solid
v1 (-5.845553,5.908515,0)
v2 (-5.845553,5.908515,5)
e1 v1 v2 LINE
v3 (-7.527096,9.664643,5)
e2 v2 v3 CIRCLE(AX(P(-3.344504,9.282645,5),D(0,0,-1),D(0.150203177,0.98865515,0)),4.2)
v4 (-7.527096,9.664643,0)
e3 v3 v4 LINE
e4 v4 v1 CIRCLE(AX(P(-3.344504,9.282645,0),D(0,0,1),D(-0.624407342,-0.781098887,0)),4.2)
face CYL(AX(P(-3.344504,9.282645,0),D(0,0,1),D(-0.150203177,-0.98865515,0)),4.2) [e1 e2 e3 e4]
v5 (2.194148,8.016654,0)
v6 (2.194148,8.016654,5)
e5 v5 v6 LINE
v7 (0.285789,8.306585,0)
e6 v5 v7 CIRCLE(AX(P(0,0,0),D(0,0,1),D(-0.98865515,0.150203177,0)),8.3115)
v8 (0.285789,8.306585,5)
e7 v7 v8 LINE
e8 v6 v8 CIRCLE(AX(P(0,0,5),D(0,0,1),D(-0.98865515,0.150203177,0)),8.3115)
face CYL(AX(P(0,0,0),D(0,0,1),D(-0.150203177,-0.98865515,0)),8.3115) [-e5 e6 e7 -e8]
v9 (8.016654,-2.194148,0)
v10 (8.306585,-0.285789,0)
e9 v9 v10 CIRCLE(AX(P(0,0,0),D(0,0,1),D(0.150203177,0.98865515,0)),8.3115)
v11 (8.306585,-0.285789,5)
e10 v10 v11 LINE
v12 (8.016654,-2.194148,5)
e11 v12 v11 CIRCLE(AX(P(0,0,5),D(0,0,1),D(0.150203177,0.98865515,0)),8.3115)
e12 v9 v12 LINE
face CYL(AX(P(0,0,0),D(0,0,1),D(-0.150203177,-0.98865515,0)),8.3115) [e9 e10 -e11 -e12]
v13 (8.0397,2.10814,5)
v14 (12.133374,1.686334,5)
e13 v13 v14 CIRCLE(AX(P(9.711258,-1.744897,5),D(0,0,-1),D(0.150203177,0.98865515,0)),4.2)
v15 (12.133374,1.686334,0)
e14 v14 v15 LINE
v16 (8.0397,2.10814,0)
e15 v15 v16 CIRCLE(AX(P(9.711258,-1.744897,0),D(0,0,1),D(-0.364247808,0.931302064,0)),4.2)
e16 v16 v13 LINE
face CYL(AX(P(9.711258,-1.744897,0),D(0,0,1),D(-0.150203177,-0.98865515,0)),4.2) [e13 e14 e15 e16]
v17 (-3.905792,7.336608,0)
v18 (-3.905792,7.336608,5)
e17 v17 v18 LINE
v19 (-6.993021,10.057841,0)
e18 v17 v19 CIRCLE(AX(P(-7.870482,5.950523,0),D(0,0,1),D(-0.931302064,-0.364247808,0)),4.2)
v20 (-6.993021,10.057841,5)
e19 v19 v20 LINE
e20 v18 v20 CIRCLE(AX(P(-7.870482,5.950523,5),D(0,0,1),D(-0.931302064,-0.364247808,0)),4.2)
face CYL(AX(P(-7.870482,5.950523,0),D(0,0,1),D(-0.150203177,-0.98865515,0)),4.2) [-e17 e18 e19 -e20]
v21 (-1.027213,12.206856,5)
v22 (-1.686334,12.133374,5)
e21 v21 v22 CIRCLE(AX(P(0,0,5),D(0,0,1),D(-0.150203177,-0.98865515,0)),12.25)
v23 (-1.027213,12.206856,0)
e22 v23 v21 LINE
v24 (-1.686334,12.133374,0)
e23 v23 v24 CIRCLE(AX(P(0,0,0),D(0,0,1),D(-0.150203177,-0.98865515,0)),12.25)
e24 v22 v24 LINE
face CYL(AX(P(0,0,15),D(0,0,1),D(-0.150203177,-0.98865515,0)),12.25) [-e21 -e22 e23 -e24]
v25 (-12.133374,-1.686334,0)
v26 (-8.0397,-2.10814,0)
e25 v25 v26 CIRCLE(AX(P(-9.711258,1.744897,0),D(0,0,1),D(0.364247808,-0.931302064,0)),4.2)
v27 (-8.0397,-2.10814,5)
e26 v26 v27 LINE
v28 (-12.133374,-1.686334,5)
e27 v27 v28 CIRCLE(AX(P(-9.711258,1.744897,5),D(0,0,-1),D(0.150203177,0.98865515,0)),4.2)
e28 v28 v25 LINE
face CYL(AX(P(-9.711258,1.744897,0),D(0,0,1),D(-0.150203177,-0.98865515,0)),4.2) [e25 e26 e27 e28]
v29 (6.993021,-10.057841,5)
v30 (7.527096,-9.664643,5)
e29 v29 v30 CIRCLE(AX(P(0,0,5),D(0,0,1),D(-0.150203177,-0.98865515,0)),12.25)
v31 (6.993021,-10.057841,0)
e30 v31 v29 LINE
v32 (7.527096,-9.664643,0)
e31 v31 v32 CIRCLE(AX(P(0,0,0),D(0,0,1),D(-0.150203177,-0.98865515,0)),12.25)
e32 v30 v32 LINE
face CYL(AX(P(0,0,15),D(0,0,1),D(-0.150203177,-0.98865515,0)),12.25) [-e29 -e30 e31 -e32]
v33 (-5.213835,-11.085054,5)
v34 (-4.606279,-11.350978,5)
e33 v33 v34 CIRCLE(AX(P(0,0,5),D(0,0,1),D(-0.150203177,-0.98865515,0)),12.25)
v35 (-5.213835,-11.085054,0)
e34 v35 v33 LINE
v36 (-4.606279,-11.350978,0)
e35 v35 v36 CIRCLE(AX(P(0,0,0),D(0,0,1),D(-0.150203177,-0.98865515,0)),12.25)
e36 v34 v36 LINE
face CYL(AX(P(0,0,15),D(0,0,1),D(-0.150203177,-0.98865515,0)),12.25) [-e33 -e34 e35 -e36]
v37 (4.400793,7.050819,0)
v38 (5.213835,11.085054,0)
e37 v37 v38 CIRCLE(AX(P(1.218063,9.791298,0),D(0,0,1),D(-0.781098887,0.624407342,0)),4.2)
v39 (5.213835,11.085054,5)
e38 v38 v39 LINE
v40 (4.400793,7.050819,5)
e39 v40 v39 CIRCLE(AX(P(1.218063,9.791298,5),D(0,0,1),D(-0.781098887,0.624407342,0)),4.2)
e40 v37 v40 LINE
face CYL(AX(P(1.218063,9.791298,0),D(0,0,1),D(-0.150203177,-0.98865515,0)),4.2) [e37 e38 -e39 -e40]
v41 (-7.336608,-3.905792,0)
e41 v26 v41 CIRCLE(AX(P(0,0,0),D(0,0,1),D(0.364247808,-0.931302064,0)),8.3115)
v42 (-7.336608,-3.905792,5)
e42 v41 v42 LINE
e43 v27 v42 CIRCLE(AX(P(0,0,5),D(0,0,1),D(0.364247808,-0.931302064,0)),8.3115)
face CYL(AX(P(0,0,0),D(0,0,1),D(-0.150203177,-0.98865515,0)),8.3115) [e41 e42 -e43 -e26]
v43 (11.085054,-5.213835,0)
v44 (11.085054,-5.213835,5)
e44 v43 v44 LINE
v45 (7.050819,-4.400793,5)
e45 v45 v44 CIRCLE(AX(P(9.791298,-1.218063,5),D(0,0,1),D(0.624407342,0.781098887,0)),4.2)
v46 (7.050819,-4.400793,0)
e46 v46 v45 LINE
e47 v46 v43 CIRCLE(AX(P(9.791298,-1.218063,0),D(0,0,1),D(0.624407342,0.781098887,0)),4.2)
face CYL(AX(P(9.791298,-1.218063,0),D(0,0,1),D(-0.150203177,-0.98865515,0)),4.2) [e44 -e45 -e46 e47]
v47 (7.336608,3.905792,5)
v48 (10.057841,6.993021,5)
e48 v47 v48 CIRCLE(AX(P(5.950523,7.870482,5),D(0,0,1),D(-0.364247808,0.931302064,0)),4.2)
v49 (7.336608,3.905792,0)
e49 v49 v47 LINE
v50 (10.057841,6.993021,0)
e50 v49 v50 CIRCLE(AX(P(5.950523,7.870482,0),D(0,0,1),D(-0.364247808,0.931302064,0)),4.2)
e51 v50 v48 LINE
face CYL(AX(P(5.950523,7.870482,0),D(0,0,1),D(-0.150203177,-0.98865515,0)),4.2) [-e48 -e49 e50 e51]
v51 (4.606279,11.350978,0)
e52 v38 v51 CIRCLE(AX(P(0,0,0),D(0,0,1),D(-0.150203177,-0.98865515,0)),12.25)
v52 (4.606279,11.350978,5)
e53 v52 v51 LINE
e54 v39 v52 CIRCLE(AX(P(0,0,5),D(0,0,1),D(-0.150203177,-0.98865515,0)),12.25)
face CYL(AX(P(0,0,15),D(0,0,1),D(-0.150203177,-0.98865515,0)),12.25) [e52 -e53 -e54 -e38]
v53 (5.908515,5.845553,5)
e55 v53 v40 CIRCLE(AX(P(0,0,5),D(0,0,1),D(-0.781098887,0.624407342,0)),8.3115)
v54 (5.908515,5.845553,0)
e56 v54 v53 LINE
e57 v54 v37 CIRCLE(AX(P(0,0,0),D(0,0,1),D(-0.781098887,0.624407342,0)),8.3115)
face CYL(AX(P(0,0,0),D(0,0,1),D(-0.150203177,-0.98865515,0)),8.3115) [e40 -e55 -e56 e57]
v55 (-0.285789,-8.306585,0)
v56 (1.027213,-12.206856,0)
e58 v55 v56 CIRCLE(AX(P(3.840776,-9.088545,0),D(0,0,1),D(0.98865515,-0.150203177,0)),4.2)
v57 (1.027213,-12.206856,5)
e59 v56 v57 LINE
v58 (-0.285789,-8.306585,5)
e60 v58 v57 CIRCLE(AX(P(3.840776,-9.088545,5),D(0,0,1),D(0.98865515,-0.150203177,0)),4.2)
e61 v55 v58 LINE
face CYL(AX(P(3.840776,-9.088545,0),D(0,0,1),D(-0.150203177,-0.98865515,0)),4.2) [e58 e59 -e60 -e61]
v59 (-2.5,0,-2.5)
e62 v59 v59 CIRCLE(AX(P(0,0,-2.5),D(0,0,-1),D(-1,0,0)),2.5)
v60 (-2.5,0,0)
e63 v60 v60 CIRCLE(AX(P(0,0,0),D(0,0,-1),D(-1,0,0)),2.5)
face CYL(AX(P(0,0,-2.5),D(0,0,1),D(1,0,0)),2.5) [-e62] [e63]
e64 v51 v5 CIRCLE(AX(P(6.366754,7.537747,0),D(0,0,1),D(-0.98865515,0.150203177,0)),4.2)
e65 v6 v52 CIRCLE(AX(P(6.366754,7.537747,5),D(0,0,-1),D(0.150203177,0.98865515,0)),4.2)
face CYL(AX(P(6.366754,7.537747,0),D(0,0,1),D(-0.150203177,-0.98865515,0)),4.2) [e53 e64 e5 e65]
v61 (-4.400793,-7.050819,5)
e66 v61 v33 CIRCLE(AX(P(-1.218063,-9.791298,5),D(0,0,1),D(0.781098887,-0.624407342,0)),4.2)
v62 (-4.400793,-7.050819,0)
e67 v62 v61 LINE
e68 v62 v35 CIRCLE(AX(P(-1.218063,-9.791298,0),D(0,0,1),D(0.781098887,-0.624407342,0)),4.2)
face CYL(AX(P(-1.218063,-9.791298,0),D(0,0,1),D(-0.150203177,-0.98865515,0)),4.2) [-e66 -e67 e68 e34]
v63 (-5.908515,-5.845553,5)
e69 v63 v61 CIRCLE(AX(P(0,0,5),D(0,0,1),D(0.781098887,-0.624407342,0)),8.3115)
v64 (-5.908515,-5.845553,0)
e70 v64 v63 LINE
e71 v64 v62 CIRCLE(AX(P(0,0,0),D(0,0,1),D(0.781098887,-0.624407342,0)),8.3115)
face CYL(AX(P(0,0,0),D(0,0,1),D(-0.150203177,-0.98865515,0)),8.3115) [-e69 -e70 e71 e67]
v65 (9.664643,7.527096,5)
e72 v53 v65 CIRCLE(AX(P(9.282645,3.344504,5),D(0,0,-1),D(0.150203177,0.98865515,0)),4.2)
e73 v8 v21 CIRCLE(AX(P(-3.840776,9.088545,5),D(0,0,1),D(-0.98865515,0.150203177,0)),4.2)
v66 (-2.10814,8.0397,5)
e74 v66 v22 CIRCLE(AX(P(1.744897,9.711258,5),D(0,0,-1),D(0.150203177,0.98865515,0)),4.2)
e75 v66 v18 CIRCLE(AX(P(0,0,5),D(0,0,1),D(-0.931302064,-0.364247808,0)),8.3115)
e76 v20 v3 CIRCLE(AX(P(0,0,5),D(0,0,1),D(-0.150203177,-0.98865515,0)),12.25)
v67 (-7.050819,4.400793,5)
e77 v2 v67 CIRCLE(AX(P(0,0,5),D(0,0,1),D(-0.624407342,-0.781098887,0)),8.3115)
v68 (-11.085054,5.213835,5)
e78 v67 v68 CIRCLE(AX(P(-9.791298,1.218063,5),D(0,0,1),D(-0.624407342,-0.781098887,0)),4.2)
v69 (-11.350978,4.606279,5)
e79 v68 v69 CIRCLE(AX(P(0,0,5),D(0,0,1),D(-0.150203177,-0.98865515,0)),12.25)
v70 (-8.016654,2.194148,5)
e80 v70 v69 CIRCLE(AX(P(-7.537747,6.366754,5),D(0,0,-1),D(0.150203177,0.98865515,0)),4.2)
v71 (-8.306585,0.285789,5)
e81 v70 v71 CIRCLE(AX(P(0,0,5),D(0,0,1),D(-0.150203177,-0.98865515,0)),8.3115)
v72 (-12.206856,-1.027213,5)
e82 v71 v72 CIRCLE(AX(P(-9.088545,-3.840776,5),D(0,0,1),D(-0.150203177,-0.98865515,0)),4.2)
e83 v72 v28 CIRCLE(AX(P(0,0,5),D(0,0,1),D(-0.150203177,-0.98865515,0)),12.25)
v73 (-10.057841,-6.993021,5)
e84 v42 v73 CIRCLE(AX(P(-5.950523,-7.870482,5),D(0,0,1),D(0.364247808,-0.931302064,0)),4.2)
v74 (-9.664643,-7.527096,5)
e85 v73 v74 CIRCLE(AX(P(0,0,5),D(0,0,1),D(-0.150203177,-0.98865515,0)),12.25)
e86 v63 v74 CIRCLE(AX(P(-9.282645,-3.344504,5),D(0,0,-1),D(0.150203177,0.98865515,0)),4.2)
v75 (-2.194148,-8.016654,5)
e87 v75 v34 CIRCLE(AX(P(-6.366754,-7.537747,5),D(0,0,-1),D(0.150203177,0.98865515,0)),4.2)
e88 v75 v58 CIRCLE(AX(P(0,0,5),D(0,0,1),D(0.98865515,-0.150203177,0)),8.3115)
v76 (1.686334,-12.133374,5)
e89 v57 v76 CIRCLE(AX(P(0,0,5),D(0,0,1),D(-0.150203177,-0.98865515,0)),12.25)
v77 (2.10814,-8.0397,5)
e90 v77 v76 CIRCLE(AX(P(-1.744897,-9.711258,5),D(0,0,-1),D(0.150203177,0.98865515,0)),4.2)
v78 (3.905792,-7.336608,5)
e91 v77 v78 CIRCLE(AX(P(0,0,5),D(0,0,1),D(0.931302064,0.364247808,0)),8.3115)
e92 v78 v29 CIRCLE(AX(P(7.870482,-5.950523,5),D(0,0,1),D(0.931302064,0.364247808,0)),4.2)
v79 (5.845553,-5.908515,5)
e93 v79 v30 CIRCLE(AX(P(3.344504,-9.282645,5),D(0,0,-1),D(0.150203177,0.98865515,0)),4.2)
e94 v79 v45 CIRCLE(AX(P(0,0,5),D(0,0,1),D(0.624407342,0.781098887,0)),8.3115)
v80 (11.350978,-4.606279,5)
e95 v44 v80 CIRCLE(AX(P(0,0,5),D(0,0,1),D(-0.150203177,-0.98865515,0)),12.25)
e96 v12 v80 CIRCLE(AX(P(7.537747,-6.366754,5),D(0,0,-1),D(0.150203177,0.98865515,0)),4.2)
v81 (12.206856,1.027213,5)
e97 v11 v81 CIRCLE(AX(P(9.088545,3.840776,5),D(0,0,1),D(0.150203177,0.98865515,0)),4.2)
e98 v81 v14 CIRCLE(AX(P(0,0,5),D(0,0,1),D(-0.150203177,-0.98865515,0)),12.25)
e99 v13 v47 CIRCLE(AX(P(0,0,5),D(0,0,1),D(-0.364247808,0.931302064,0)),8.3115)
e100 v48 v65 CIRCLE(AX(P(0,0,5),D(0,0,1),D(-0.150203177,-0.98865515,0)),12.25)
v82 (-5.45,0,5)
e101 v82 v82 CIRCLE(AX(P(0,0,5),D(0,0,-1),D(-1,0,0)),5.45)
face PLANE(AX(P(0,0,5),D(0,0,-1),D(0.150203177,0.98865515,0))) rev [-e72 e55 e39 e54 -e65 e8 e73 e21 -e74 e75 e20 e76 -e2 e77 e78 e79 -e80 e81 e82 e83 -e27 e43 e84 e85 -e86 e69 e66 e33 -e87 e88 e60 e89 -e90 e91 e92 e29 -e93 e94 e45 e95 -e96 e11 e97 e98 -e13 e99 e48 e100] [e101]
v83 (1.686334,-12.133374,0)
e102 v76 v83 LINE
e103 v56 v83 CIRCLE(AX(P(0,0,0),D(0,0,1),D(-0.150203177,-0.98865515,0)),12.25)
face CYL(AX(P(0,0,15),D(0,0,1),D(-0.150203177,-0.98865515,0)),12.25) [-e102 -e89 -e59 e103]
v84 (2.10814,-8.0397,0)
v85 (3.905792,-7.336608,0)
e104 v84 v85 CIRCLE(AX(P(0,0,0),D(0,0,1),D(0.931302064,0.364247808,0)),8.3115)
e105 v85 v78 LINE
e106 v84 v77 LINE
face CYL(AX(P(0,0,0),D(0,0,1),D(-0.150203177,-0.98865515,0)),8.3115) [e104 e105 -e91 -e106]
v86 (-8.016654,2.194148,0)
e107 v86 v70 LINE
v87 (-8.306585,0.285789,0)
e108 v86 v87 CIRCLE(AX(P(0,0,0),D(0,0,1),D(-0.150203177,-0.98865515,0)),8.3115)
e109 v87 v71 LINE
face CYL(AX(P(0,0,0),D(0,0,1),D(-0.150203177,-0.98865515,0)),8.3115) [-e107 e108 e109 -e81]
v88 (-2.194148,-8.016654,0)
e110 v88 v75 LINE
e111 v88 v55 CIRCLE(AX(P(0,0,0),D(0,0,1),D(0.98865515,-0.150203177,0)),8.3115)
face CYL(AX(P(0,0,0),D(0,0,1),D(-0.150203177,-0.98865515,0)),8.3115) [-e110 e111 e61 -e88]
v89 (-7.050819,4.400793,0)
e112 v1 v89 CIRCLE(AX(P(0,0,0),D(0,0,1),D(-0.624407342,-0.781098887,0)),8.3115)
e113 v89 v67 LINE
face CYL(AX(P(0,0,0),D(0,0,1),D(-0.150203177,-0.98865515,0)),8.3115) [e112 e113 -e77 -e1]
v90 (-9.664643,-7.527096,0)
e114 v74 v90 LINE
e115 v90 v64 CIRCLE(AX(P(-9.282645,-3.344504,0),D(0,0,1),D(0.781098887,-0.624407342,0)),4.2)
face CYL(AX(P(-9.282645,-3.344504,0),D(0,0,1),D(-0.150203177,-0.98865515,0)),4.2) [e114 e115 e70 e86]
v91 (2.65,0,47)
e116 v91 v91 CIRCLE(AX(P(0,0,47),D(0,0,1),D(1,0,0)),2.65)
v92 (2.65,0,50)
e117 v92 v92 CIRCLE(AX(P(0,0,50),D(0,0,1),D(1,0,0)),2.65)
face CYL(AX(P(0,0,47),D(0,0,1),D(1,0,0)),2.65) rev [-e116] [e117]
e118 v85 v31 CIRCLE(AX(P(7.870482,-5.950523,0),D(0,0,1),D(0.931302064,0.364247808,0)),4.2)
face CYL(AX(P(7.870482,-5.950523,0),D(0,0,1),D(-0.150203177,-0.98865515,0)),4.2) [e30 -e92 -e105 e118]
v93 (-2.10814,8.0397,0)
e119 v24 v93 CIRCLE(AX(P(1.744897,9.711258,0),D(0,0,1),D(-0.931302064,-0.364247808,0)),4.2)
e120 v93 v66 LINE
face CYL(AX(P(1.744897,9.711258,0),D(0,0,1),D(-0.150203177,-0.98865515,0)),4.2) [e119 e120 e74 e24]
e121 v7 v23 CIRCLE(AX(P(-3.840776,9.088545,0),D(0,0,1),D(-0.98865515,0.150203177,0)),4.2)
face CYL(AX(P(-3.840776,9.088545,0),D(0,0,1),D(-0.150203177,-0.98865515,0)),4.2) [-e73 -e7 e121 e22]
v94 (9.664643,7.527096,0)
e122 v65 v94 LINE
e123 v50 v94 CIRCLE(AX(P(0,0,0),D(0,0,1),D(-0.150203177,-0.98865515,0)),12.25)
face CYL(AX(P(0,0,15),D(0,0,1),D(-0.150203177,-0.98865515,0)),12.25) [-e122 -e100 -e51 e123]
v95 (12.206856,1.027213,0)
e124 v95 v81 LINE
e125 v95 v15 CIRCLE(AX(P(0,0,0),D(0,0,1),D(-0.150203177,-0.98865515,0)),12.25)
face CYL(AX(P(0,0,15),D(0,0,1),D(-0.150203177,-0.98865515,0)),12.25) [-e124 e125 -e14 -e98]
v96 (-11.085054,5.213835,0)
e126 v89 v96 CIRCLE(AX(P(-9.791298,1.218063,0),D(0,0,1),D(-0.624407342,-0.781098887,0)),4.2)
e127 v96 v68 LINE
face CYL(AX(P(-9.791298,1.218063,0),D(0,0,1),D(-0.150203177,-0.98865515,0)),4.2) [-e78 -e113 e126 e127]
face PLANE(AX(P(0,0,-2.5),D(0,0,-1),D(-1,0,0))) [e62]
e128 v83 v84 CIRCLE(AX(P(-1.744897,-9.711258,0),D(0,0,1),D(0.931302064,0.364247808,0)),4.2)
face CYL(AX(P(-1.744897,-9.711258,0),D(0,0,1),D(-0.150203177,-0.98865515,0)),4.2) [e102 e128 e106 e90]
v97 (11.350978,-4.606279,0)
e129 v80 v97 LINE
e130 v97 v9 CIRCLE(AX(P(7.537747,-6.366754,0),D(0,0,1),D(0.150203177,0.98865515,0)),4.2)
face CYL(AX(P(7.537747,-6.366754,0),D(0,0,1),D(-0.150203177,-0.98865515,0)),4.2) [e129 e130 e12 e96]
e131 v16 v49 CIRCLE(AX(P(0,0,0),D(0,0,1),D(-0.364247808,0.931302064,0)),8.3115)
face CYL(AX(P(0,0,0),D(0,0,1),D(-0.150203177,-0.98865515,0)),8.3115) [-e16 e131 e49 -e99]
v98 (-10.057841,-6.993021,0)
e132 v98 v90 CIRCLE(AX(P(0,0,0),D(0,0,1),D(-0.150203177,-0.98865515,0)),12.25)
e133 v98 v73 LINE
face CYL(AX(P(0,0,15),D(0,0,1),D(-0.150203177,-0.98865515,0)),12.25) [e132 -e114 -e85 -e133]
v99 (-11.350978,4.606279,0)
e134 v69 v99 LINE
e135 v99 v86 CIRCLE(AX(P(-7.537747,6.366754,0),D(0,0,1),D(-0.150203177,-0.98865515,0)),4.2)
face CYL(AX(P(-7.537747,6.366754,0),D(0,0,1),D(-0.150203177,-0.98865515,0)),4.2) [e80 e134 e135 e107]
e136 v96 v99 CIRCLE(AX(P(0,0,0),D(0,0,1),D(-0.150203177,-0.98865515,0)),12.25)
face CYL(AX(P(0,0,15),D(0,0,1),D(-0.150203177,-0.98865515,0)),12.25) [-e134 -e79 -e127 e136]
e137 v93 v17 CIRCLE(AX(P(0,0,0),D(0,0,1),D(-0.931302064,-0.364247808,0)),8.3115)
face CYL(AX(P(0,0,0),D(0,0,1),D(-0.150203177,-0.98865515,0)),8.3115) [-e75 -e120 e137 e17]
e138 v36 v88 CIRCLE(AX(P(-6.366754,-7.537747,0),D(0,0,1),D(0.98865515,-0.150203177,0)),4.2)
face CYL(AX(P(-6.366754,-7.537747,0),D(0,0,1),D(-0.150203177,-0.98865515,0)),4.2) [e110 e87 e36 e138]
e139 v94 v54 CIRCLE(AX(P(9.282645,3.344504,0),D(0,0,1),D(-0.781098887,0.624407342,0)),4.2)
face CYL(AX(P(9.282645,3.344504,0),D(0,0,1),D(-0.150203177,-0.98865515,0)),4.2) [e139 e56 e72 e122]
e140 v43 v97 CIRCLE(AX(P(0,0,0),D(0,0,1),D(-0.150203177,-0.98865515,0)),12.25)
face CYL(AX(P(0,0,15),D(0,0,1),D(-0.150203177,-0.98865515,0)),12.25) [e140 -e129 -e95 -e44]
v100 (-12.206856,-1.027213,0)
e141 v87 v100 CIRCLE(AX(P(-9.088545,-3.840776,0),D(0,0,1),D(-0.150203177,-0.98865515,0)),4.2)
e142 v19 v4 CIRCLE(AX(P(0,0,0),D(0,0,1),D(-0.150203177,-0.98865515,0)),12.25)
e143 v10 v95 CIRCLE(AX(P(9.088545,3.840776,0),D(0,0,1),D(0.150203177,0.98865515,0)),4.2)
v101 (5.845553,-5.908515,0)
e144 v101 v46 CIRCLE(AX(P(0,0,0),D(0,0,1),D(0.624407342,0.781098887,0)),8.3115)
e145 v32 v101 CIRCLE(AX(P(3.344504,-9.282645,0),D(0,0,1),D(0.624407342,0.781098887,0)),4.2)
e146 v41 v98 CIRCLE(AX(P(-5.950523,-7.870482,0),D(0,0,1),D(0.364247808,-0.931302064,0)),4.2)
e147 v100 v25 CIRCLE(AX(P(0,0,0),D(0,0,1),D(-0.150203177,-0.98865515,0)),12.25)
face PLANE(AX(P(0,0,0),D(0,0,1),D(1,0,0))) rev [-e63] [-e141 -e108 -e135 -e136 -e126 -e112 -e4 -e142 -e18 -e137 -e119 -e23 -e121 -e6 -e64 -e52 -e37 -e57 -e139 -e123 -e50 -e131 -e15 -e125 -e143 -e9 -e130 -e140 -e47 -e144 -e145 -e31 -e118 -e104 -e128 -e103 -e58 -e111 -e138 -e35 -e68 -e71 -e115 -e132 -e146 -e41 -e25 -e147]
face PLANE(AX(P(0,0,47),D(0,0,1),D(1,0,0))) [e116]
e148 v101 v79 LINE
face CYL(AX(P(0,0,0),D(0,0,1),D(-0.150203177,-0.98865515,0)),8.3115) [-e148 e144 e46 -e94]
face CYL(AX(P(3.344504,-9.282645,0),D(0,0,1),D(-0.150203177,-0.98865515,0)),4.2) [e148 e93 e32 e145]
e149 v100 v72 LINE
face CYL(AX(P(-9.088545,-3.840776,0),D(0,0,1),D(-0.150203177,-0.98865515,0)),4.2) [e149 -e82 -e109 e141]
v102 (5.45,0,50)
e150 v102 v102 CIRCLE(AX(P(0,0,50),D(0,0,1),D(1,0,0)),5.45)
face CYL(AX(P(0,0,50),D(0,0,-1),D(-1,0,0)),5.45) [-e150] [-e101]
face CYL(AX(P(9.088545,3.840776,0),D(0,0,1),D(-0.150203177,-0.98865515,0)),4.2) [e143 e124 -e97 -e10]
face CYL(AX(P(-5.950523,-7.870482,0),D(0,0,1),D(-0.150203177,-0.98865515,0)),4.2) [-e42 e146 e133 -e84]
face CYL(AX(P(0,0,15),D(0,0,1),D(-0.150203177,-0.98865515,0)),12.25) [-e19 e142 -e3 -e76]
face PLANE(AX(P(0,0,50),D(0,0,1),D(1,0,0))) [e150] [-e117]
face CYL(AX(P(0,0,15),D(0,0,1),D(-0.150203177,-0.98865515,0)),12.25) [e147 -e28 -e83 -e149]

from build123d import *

# Parameters (mm, degrees)
SKETCH1_R           = 5.45
BOSS_EXTRUDE1_DEPTH = 50
SKETCH6_R           = 2.5
BOSS_EXTRUDE2_DEPTH = 2.5
SKETCH7_R           = 2.65
CUT_EXTRUDE1_DEPTH  = 3
JOIN1_DEPTH         = 5


# Read off the part's stored shape, not the designer's step: Join1
with BuildPart() as part:
    # Sketch1 → Boss-Extrude1 (new body)
    with BuildSketch(Plane.XY):
        Circle(SKETCH1_R)
    extrude(amount=BOSS_EXTRUDE1_DEPTH)

    # Sketch6 → Boss-Extrude2 (add)
    with BuildSketch(Plane(origin=(0, 0, 0), x_dir=(-1, 0, 0), z_dir=(0, 0, -1))):
        Circle(SKETCH6_R)
    extrude(amount=BOSS_EXTRUDE2_DEPTH)

    # Sketch7 → Cut-Extrude1 (cut)
    with BuildSketch(Plane.XY.offset(50)):
        Circle(SKETCH7_R)
    extrude(amount=-CUT_EXTRUDE1_DEPTH, mode=Mode.SUBTRACT)

    # Join1 outline → Join1 (add)
    with BuildSketch(Plane.XY):
        with BuildLine():
            ThreePointArc((3.905791733, -7.336608426), (5.093273997, -9.101255459), (6.993020796, -10.05784073))
            ThreePointArc((6.993020796, -10.05784073), (7.262719681, -9.864856959), (7.527095748, -9.664643274))
            ThreePointArc((7.527095748, -9.664643274), (7.177895055, -7.56651264), (5.845552604, -5.908514788))
            ThreePointArc((5.845552604, -5.908514788), (6.492103401, -5.189761622), (7.050819075, -4.400793408))
            ThreePointArc((7.050819075, -4.400793408), (8.961532399, -5.335281436), (11.085054023, -5.213835182))
            ThreePointArc((11.085054023, -5.213835182), (11.222128224, -4.911856891), (11.350977771, -4.60627872))
            ThreePointArc((11.350977771, -4.60627872), (9.999495783, -2.963844637), (8.016654448, -2.194147603))
            ThreePointArc((8.016654448, -2.194147603), (8.21720728, -1.248413703), (8.306585141, -0.28578935))
            ThreePointArc((8.306585141, -0.28578935), (10.428555432, -0.13972306), (12.206855977, 1.027213293))
            ThreePointArc((12.206855977, 1.027213293), (12.174576572, 1.357271264), (12.133374467, 1.686334497))
            ThreePointArc((12.133374467, 1.686334497), (10.141739691, 2.432983143), (8.039700207, 2.10813966))
            ThreePointArc((8.039700207, 2.10813966), (7.740517104, 3.027445658), (7.336608426, 3.905791733))
            ThreePointArc((7.336608426, 3.905791733), (9.101255459, 5.093273997), (10.05784073, 6.993020796))
            ThreePointArc((10.05784073, 6.993020796), (9.864856959, 7.262719681), (9.664643274, 7.527095748))
            ThreePointArc((9.664643274, 7.527095748), (7.56651264, 7.177895055), (5.908514788, 5.845552604))
            ThreePointArc((5.908514788, 5.845552604), (5.189761622, 6.492103401), (4.400793408, 7.050819075))
            ThreePointArc((4.400793408, 7.050819075), (5.335281436, 8.961532399), (5.213835182, 11.085054023))
            ThreePointArc((5.213835182, 11.085054023), (4.911856891, 11.222128224), (4.60627872, 11.350977771))
            ThreePointArc((4.60627872, 11.350977771), (2.963844637, 9.999495783), (2.194147603, 8.016654448))
            ThreePointArc((2.194147603, 8.016654448), (1.248413703, 8.21720728), (0.28578935, 8.306585141))
            ThreePointArc((0.28578935, 8.306585141), (0.13972306, 10.428555432), (-1.027213293, 12.206855977))
            ThreePointArc((-1.027213293, 12.206855977), (-1.357271264, 12.174576572), (-1.686334497, 12.133374467))
            ThreePointArc((-1.686334497, 12.133374467), (-2.432983143, 10.141739691), (-2.10813966, 8.039700207))
            ThreePointArc((-2.10813966, 8.039700207), (-3.027445658, 7.740517104), (-3.905791733, 7.336608426))
            ThreePointArc((-3.905791733, 7.336608426), (-5.093273997, 9.101255459), (-6.993020796, 10.05784073))
            ThreePointArc((-6.993020796, 10.05784073), (-7.262719681, 9.864856959), (-7.527095748, 9.664643274))
            ThreePointArc((-7.527095748, 9.664643274), (-7.177895055, 7.56651264), (-5.845552604, 5.908514788))
            ThreePointArc((-5.845552604, 5.908514788), (-6.492103401, 5.189761622), (-7.050819075, 4.400793408))
            ThreePointArc((-7.050819075, 4.400793408), (-8.961532399, 5.335281436), (-11.085054023, 5.213835182))
            ThreePointArc((-11.085054023, 5.213835182), (-11.222128224, 4.911856891), (-11.350977771, 4.60627872))
            ThreePointArc((-11.350977771, 4.60627872), (-9.999495783, 2.963844637), (-8.016654448, 2.194147603))
            ThreePointArc((-8.016654448, 2.194147603), (-8.21720728, 1.248413703), (-8.306585141, 0.28578935))
            ThreePointArc((-8.306585141, 0.28578935), (-10.428555432, 0.13972306), (-12.206855977, -1.027213293))
            ThreePointArc((-12.206855977, -1.027213293), (-12.174576572, -1.357271264), (-12.133374467, -1.686334497))
            ThreePointArc((-12.133374467, -1.686334497), (-10.141739691, -2.432983143), (-8.039700207, -2.10813966))
            ThreePointArc((-8.039700207, -2.10813966), (-7.740517104, -3.027445658), (-7.336608426, -3.905791733))
            ThreePointArc((-7.336608426, -3.905791733), (-9.101255459, -5.093273997), (-10.05784073, -6.993020796))
            ThreePointArc((-10.05784073, -6.993020796), (-9.864856959, -7.262719681), (-9.664643274, -7.527095748))
            ThreePointArc((-9.664643274, -7.527095748), (-7.56651264, -7.177895055), (-5.908514788, -5.845552604))
            ThreePointArc((-5.908514788, -5.845552604), (-5.189761622, -6.492103401), (-4.400793408, -7.050819075))
            ThreePointArc((-4.400793408, -7.050819075), (-5.335281436, -8.961532399), (-5.213835182, -11.085054023))
            ThreePointArc((-5.213835182, -11.085054023), (-4.911856891, -11.222128224), (-4.60627872, -11.350977771))
            ThreePointArc((-4.60627872, -11.350977771), (-2.963844637, -9.999495783), (-2.194147603, -8.016654448))
            ThreePointArc((-2.194147603, -8.016654448), (-1.248413703, -8.21720728), (-0.28578935, -8.306585141))
            ThreePointArc((-0.28578935, -8.306585141), (-0.13972306, -10.428555432), (1.027213293, -12.206855977))
            ThreePointArc((1.027213293, -12.206855977), (1.357271264, -12.174576572), (1.686334497, -12.133374467))
            ThreePointArc((1.686334497, -12.133374467), (2.432983143, -10.141739691), (2.10813966, -8.039700207))
            ThreePointArc((2.10813966, -8.039700207), (3.027445658, -7.740517104), (3.905791733, -7.336608426))
        make_face()
    extrude(amount=JOIN1_DEPTH)


solid = part.part
